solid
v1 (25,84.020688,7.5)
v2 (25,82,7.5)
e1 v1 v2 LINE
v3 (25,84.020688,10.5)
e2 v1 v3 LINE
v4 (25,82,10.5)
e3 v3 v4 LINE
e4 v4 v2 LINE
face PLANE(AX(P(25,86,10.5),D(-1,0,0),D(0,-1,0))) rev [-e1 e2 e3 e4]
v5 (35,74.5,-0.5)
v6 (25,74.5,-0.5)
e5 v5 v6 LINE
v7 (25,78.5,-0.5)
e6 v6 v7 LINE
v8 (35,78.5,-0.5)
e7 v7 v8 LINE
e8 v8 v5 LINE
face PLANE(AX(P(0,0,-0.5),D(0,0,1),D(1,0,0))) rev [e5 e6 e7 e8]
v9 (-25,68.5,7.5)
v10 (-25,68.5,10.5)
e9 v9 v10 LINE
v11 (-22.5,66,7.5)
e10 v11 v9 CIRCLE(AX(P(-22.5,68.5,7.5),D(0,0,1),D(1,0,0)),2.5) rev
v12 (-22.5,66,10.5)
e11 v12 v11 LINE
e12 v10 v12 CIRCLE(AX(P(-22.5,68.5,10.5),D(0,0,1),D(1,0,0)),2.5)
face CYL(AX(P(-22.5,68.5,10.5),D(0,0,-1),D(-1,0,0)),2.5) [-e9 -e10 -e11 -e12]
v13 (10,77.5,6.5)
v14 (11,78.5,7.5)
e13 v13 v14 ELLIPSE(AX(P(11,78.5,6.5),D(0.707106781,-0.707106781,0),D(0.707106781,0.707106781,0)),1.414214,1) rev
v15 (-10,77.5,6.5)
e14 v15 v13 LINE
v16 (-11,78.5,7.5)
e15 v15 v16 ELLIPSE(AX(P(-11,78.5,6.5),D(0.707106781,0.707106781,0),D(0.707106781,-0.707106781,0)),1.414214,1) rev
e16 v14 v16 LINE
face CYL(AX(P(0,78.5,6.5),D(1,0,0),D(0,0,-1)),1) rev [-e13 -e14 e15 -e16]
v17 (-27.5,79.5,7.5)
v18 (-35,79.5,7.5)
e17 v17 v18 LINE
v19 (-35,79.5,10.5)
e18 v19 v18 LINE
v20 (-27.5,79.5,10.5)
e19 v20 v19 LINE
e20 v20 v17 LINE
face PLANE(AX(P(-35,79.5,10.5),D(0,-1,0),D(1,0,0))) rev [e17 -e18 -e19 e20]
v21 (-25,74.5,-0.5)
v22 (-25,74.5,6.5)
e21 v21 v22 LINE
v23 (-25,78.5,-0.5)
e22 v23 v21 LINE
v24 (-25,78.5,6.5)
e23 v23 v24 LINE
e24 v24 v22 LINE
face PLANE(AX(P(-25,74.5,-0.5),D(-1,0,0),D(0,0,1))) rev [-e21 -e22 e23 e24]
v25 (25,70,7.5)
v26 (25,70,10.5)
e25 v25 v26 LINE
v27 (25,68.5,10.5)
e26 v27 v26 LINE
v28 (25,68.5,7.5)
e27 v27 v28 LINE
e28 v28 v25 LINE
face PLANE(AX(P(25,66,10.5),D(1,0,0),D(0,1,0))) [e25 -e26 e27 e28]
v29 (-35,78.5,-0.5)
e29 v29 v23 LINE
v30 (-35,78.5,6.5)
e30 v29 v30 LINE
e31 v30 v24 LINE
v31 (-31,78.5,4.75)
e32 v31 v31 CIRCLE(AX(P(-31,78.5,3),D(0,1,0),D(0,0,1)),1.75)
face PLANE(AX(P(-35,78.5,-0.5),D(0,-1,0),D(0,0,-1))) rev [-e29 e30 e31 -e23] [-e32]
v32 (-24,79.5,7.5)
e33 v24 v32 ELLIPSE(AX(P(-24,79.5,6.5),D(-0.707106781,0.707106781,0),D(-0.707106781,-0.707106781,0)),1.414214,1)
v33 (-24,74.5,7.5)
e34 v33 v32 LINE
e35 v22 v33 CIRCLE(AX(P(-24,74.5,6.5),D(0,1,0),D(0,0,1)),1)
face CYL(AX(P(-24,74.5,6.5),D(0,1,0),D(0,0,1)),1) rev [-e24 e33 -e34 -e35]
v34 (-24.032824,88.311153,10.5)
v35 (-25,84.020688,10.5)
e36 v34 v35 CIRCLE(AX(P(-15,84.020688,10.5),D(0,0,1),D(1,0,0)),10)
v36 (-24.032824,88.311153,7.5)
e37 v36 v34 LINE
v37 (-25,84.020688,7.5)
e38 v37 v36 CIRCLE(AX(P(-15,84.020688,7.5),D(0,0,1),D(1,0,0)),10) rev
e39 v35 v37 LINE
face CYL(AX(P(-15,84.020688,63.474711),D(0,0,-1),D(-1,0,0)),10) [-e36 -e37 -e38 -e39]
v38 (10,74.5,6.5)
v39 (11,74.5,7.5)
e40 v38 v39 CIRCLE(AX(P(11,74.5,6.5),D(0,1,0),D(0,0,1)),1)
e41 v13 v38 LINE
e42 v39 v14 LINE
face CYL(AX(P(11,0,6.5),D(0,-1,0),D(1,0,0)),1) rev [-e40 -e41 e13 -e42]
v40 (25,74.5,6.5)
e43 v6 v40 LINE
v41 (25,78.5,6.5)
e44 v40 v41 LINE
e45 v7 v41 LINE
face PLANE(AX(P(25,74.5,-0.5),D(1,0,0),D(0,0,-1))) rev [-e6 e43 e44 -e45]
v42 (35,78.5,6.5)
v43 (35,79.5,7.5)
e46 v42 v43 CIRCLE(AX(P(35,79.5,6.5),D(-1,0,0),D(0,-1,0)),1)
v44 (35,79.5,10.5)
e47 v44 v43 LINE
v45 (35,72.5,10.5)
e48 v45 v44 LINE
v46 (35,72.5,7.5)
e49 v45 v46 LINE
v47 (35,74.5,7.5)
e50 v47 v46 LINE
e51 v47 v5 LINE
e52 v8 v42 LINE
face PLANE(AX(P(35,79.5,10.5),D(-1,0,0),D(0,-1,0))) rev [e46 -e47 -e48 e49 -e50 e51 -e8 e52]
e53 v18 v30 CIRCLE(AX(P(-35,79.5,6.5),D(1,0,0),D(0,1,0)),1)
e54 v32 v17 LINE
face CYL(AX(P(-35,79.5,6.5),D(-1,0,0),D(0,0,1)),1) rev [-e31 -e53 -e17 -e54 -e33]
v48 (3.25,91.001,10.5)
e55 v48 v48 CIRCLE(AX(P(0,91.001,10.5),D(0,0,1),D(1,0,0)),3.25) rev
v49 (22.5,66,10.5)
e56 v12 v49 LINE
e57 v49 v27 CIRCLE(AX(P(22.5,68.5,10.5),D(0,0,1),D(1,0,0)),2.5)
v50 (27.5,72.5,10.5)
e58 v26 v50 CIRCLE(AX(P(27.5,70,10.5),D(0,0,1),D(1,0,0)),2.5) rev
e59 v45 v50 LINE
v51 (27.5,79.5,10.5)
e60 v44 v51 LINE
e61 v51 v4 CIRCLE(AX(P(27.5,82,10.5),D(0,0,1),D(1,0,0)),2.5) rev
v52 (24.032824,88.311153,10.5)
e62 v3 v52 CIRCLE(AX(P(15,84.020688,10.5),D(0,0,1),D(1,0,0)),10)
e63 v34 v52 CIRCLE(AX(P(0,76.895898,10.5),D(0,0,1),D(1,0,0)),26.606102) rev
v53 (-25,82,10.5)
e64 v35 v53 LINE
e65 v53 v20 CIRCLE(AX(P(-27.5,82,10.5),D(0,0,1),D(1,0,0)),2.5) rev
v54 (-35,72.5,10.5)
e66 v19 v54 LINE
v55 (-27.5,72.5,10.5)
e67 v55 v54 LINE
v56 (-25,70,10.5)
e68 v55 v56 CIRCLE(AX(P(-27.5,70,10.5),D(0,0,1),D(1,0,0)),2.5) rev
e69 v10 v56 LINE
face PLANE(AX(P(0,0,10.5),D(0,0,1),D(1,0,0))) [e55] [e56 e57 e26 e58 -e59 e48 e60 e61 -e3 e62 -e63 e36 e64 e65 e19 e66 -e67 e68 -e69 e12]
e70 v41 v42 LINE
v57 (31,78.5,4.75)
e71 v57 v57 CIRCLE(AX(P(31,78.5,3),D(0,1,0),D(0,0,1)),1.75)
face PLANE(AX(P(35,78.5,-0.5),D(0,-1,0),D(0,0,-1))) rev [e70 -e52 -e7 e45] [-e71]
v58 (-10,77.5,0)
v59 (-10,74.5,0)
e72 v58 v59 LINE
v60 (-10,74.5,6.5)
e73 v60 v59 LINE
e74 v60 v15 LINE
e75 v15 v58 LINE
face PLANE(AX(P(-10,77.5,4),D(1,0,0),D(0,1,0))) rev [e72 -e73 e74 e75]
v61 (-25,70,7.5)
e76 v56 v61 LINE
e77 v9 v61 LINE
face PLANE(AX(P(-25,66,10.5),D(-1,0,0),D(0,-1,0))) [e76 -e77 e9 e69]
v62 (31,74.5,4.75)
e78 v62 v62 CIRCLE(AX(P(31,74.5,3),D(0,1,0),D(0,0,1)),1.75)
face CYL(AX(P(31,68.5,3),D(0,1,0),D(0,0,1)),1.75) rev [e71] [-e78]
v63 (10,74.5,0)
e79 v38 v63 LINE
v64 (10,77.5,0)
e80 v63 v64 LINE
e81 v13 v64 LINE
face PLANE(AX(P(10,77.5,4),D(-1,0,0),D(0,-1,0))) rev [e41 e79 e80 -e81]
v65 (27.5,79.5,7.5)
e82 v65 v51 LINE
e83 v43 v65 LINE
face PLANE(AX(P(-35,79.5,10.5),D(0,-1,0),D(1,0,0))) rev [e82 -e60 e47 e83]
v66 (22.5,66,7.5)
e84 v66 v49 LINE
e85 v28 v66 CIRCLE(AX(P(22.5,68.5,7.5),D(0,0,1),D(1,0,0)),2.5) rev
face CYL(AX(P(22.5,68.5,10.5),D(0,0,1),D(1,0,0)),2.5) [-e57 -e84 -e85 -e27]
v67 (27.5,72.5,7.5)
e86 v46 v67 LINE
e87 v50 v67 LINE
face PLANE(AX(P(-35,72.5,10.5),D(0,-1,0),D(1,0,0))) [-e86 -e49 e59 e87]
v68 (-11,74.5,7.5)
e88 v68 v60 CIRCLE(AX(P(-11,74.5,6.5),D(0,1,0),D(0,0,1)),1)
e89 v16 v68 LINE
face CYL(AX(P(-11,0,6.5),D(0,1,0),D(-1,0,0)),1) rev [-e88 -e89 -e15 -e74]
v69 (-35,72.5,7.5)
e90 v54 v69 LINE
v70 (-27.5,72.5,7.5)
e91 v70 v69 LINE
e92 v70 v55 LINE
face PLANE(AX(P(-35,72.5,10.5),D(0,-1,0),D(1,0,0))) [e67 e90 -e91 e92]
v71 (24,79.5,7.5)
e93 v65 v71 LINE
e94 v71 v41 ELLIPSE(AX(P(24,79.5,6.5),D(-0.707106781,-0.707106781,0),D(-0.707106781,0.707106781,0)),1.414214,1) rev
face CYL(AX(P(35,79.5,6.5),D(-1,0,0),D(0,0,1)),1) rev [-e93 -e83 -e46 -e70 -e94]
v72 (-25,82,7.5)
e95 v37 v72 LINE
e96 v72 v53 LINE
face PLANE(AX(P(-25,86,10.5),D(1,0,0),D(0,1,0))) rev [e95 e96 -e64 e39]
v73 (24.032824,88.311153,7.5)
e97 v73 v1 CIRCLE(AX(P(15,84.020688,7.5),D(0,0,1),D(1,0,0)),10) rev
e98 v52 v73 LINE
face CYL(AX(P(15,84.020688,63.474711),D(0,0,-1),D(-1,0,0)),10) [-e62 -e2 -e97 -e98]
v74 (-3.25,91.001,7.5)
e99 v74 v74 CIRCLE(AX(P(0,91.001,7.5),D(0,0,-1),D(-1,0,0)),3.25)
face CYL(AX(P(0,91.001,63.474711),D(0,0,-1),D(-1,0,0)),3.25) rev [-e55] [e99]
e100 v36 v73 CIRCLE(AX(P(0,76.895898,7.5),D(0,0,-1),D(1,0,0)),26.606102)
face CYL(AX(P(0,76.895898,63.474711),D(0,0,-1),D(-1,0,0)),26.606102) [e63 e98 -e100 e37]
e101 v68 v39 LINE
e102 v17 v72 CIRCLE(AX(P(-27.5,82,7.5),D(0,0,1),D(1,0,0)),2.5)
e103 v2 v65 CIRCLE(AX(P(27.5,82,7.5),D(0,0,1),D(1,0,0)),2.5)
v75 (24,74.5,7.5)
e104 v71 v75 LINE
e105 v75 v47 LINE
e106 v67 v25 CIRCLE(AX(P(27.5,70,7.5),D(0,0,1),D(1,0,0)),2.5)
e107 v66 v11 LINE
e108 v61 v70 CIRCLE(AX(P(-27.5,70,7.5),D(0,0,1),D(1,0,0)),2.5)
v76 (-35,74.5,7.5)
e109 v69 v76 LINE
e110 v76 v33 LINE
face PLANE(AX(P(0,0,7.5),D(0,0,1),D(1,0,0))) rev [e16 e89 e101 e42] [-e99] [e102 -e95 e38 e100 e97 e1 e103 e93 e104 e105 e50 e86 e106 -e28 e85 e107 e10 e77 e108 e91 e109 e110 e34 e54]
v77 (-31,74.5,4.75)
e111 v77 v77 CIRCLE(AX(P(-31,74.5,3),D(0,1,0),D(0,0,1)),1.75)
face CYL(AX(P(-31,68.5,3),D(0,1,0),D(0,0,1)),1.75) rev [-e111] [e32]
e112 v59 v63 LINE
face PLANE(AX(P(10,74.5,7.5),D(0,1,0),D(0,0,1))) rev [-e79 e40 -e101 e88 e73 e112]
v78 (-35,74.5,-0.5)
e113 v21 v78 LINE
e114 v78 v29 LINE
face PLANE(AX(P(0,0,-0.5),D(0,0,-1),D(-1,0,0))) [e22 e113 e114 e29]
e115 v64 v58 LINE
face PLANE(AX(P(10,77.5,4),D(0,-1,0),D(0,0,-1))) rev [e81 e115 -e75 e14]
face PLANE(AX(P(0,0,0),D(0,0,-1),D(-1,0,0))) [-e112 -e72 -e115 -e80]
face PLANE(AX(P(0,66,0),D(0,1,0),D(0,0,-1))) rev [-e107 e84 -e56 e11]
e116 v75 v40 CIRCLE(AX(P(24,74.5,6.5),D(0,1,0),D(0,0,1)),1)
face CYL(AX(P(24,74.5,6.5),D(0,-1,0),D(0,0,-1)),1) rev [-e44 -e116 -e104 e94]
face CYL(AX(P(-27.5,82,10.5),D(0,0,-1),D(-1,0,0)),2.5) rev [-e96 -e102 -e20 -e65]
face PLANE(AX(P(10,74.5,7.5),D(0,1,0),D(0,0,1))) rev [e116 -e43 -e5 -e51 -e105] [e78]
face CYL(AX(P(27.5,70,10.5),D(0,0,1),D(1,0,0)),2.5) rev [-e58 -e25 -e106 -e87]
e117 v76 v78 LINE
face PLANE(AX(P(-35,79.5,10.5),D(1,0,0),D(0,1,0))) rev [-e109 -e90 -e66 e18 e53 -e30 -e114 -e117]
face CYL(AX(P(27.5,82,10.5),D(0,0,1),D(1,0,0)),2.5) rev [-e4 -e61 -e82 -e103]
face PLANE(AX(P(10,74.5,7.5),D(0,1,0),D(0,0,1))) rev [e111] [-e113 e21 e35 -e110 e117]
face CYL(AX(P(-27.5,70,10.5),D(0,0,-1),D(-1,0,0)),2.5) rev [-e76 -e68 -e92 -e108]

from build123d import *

# Parameters (mm, degrees)
SKETCH1_W           = 20
SKETCH1_H           = 155
BOSS_EXTRUDE1_DEPTH = 4
SKETCH2_W           = 20
SKETCH2_H           = 4
BOSS_EXTRUDE3_DEPTH = 50
RIB2_REACH          = 96.986
SKETCH7_WALL_W      = 290.205463948
SKETCH7_WALL_H      = 4
SKETCH8_W           = 20
SKETCH8_H           = 3
BOSS_EXTRUDE4_DEPTH = 3.5
SKETCH9_W           = 70
SKETCH9_H           = 5
BOSS_EXTRUDE6_DEPTH = 3
SKETCH10_W          = 10
SKETCH10_H          = 4
BOSS_EXTRUDE7_DEPTH = 8
SKETCH12_R          = 1.75
CUT_EXTRUDE1_DEPTH  = 10
SKETCH13_W          = 111.319070758
SKETCH13_H          = 99.743885808
CUT_EXTRUDE2_DEPTH  = 152
SKETCH14_W          = 50
SKETCH14_H          = 3
BOSS_EXTRUDE8_DEPTH = 6.5
FILLET1_R           = 1
FILLET2_R           = 2.5
SKETCH15_R          = 3.25
BOSS_EXTRUDE9_DEPTH = 3
FILLET3_R           = 10


with BuildPart() as part:
    # Sketch1 → Boss-Extrude1 (new body)
    with BuildSketch(Plane.XY):
        Rectangle(SKETCH1_W, SKETCH1_H)
    extrude(amount=BOSS_EXTRUDE1_DEPTH)

    # Sketch2 → Boss-Extrude3 (add)
    with BuildSketch(Plane.XY.offset(4)):
        with Locations((0, -75.5)):
            Rectangle(SKETCH2_W, SKETCH2_H)
    extrude(amount=BOSS_EXTRUDE3_DEPTH)

    # Sketch7 wall → Rib2 (add, up to next)
    with BuildSketch(Plane(origin=(0, -26, 16.5), x_dir=(0, 0.967074537263, -0.25449329928), z_dir=(0, 0.25449329928, 0.967074537263)), mode=Mode.PRIVATE) as rib2_sk1:
        Rectangle(SKETCH7_WALL_W, SKETCH7_WALL_H)
    rib2_tool1 = extrude(rib2_sk1.sketch, amount=-RIB2_REACH, mode=Mode.PRIVATE) - part.part
    add(rib2_tool1.solids().sort_by_distance((0, -26, 16.5))[0])

    # Sketch8 → Boss-Extrude4 (add)
    with BuildSketch(Plane.XY.offset(4)):
        with Locations((0, 76)):
            Rectangle(SKETCH8_W, SKETCH8_H)
    extrude(amount=BOSS_EXTRUDE4_DEPTH)

    # Sketch9 → Boss-Extrude6 (add)
    with BuildSketch(Plane.XY.offset(7.5)):
        with Locations((0, 77)):
            Rectangle(SKETCH9_W, SKETCH9_H)
    boss_extrude6 = extrude(amount=BOSS_EXTRUDE6_DEPTH)

    # Sketch10 → Boss-Extrude7 (add)
    with BuildSketch(Plane(origin=(0, 0, 7.5), x_dir=(-1, 0, 0), z_dir=(0, 0, -1))):
        with Locations((30, 76.5)):
            Rectangle(SKETCH10_W, SKETCH10_H)
        with Locations((-30, 76.5)):
            Rectangle(SKETCH10_W, SKETCH10_H)
    extrude(amount=BOSS_EXTRUDE7_DEPTH)

    # Sketch12 → Cut-Extrude1 (cut)
    with BuildSketch(Plane(origin=(0, 78.5, 0), x_dir=(1, 0, 0), z_dir=(0, 1, 0))):
        with Locations(Location((-31, -3, 0), (0, 0, 270))):
            Circle(SKETCH12_R)
        with Locations(Location((31, -3, 0), (0, 0, 270))):
            Circle(SKETCH12_R)
    extrude(amount=-CUT_EXTRUDE1_DEPTH, mode=Mode.SUBTRACT)

    # Sketch13 → Cut-Extrude2 (cut)
    with BuildSketch(Plane.XZ.offset(77.5)):
        with Locations((2.652852139, 20.474703111)):
            Rectangle(SKETCH13_W, SKETCH13_H)
    extrude(amount=-CUT_EXTRUDE2_DEPTH, mode=Mode.SUBTRACT)

    # Sketch14 → Boss-Extrude8 (add)
    with BuildSketch(Plane(origin=(0, 79.5, 0), x_dir=(1, 0, 0), z_dir=(0, 1, 0))):
        with Locations((0, -9)):
            Rectangle(SKETCH14_W, SKETCH14_H)
    boss_extrude8 = extrude(amount=BOSS_EXTRUDE8_DEPTH)

    # Mirror1: Boss-Extrude6, Boss-Extrude8 across plane
    add(boss_extrude6.mirror(Plane(origin=(0, 76, 0), x_dir=(0, 0, 1), z_dir=(0, -1, 0))))
    add(boss_extrude8.mirror(Plane(origin=(0, 76, 0), x_dir=(0, 0, 1), z_dir=(0, -1, 0))))

    # Fillet1
    fillet1_edges = [part.edges().sort_by_distance(p)[0] for p in [
        (30, 78.5, 7.5),
        (-30, 78.5, 7.5),
        (10, 76, 7.5),
        (-10, 76, 7.5),
        (0, 77.5, 7.5),
        (25, 76.5, 7.5),
        (-25, 76.5, 7.5),
    ]]
    fillet(fillet1_edges, radius=FILLET1_R - 0.0001)  # a hair under: the kernel refuses the full size

    # Fillet2
    fillet2_edges = [part.edges().sort_by_distance(p)[0] for p in [
        (-25, 79.5, 9),
        (25, 79.5, 9),
        (-25, 66, 9),
        (25, 66, 9),
        (-25, 72.5, 9),
        (25, 72.5, 9),
    ]]
    fillet(fillet2_edges, radius=FILLET2_R)

    # Sketch15 → Boss-Extrude9 (add)
    with BuildSketch(Plane(origin=(0, 0, 7.5), x_dir=(-1, 0, 0), z_dir=(0, 0, -1))):
        with BuildLine():
            Line((25, 86), (-25, 86))
            ThreePointArc((-25, 86), (0, 103.502), (25, 86))
        make_face()
        with Locations((0, 91.001)):
            Circle(SKETCH15_R, mode=Mode.SUBTRACT)
    extrude(amount=-BOSS_EXTRUDE9_DEPTH)

    # Fillet3
    fillet3_edges = [part.edges().sort_by_distance(p)[0] for p in [
        (-25, 86, 9),
        (25, 86, 9),
    ]]
    fillet(fillet3_edges, radius=FILLET3_R)


solid = part.part
